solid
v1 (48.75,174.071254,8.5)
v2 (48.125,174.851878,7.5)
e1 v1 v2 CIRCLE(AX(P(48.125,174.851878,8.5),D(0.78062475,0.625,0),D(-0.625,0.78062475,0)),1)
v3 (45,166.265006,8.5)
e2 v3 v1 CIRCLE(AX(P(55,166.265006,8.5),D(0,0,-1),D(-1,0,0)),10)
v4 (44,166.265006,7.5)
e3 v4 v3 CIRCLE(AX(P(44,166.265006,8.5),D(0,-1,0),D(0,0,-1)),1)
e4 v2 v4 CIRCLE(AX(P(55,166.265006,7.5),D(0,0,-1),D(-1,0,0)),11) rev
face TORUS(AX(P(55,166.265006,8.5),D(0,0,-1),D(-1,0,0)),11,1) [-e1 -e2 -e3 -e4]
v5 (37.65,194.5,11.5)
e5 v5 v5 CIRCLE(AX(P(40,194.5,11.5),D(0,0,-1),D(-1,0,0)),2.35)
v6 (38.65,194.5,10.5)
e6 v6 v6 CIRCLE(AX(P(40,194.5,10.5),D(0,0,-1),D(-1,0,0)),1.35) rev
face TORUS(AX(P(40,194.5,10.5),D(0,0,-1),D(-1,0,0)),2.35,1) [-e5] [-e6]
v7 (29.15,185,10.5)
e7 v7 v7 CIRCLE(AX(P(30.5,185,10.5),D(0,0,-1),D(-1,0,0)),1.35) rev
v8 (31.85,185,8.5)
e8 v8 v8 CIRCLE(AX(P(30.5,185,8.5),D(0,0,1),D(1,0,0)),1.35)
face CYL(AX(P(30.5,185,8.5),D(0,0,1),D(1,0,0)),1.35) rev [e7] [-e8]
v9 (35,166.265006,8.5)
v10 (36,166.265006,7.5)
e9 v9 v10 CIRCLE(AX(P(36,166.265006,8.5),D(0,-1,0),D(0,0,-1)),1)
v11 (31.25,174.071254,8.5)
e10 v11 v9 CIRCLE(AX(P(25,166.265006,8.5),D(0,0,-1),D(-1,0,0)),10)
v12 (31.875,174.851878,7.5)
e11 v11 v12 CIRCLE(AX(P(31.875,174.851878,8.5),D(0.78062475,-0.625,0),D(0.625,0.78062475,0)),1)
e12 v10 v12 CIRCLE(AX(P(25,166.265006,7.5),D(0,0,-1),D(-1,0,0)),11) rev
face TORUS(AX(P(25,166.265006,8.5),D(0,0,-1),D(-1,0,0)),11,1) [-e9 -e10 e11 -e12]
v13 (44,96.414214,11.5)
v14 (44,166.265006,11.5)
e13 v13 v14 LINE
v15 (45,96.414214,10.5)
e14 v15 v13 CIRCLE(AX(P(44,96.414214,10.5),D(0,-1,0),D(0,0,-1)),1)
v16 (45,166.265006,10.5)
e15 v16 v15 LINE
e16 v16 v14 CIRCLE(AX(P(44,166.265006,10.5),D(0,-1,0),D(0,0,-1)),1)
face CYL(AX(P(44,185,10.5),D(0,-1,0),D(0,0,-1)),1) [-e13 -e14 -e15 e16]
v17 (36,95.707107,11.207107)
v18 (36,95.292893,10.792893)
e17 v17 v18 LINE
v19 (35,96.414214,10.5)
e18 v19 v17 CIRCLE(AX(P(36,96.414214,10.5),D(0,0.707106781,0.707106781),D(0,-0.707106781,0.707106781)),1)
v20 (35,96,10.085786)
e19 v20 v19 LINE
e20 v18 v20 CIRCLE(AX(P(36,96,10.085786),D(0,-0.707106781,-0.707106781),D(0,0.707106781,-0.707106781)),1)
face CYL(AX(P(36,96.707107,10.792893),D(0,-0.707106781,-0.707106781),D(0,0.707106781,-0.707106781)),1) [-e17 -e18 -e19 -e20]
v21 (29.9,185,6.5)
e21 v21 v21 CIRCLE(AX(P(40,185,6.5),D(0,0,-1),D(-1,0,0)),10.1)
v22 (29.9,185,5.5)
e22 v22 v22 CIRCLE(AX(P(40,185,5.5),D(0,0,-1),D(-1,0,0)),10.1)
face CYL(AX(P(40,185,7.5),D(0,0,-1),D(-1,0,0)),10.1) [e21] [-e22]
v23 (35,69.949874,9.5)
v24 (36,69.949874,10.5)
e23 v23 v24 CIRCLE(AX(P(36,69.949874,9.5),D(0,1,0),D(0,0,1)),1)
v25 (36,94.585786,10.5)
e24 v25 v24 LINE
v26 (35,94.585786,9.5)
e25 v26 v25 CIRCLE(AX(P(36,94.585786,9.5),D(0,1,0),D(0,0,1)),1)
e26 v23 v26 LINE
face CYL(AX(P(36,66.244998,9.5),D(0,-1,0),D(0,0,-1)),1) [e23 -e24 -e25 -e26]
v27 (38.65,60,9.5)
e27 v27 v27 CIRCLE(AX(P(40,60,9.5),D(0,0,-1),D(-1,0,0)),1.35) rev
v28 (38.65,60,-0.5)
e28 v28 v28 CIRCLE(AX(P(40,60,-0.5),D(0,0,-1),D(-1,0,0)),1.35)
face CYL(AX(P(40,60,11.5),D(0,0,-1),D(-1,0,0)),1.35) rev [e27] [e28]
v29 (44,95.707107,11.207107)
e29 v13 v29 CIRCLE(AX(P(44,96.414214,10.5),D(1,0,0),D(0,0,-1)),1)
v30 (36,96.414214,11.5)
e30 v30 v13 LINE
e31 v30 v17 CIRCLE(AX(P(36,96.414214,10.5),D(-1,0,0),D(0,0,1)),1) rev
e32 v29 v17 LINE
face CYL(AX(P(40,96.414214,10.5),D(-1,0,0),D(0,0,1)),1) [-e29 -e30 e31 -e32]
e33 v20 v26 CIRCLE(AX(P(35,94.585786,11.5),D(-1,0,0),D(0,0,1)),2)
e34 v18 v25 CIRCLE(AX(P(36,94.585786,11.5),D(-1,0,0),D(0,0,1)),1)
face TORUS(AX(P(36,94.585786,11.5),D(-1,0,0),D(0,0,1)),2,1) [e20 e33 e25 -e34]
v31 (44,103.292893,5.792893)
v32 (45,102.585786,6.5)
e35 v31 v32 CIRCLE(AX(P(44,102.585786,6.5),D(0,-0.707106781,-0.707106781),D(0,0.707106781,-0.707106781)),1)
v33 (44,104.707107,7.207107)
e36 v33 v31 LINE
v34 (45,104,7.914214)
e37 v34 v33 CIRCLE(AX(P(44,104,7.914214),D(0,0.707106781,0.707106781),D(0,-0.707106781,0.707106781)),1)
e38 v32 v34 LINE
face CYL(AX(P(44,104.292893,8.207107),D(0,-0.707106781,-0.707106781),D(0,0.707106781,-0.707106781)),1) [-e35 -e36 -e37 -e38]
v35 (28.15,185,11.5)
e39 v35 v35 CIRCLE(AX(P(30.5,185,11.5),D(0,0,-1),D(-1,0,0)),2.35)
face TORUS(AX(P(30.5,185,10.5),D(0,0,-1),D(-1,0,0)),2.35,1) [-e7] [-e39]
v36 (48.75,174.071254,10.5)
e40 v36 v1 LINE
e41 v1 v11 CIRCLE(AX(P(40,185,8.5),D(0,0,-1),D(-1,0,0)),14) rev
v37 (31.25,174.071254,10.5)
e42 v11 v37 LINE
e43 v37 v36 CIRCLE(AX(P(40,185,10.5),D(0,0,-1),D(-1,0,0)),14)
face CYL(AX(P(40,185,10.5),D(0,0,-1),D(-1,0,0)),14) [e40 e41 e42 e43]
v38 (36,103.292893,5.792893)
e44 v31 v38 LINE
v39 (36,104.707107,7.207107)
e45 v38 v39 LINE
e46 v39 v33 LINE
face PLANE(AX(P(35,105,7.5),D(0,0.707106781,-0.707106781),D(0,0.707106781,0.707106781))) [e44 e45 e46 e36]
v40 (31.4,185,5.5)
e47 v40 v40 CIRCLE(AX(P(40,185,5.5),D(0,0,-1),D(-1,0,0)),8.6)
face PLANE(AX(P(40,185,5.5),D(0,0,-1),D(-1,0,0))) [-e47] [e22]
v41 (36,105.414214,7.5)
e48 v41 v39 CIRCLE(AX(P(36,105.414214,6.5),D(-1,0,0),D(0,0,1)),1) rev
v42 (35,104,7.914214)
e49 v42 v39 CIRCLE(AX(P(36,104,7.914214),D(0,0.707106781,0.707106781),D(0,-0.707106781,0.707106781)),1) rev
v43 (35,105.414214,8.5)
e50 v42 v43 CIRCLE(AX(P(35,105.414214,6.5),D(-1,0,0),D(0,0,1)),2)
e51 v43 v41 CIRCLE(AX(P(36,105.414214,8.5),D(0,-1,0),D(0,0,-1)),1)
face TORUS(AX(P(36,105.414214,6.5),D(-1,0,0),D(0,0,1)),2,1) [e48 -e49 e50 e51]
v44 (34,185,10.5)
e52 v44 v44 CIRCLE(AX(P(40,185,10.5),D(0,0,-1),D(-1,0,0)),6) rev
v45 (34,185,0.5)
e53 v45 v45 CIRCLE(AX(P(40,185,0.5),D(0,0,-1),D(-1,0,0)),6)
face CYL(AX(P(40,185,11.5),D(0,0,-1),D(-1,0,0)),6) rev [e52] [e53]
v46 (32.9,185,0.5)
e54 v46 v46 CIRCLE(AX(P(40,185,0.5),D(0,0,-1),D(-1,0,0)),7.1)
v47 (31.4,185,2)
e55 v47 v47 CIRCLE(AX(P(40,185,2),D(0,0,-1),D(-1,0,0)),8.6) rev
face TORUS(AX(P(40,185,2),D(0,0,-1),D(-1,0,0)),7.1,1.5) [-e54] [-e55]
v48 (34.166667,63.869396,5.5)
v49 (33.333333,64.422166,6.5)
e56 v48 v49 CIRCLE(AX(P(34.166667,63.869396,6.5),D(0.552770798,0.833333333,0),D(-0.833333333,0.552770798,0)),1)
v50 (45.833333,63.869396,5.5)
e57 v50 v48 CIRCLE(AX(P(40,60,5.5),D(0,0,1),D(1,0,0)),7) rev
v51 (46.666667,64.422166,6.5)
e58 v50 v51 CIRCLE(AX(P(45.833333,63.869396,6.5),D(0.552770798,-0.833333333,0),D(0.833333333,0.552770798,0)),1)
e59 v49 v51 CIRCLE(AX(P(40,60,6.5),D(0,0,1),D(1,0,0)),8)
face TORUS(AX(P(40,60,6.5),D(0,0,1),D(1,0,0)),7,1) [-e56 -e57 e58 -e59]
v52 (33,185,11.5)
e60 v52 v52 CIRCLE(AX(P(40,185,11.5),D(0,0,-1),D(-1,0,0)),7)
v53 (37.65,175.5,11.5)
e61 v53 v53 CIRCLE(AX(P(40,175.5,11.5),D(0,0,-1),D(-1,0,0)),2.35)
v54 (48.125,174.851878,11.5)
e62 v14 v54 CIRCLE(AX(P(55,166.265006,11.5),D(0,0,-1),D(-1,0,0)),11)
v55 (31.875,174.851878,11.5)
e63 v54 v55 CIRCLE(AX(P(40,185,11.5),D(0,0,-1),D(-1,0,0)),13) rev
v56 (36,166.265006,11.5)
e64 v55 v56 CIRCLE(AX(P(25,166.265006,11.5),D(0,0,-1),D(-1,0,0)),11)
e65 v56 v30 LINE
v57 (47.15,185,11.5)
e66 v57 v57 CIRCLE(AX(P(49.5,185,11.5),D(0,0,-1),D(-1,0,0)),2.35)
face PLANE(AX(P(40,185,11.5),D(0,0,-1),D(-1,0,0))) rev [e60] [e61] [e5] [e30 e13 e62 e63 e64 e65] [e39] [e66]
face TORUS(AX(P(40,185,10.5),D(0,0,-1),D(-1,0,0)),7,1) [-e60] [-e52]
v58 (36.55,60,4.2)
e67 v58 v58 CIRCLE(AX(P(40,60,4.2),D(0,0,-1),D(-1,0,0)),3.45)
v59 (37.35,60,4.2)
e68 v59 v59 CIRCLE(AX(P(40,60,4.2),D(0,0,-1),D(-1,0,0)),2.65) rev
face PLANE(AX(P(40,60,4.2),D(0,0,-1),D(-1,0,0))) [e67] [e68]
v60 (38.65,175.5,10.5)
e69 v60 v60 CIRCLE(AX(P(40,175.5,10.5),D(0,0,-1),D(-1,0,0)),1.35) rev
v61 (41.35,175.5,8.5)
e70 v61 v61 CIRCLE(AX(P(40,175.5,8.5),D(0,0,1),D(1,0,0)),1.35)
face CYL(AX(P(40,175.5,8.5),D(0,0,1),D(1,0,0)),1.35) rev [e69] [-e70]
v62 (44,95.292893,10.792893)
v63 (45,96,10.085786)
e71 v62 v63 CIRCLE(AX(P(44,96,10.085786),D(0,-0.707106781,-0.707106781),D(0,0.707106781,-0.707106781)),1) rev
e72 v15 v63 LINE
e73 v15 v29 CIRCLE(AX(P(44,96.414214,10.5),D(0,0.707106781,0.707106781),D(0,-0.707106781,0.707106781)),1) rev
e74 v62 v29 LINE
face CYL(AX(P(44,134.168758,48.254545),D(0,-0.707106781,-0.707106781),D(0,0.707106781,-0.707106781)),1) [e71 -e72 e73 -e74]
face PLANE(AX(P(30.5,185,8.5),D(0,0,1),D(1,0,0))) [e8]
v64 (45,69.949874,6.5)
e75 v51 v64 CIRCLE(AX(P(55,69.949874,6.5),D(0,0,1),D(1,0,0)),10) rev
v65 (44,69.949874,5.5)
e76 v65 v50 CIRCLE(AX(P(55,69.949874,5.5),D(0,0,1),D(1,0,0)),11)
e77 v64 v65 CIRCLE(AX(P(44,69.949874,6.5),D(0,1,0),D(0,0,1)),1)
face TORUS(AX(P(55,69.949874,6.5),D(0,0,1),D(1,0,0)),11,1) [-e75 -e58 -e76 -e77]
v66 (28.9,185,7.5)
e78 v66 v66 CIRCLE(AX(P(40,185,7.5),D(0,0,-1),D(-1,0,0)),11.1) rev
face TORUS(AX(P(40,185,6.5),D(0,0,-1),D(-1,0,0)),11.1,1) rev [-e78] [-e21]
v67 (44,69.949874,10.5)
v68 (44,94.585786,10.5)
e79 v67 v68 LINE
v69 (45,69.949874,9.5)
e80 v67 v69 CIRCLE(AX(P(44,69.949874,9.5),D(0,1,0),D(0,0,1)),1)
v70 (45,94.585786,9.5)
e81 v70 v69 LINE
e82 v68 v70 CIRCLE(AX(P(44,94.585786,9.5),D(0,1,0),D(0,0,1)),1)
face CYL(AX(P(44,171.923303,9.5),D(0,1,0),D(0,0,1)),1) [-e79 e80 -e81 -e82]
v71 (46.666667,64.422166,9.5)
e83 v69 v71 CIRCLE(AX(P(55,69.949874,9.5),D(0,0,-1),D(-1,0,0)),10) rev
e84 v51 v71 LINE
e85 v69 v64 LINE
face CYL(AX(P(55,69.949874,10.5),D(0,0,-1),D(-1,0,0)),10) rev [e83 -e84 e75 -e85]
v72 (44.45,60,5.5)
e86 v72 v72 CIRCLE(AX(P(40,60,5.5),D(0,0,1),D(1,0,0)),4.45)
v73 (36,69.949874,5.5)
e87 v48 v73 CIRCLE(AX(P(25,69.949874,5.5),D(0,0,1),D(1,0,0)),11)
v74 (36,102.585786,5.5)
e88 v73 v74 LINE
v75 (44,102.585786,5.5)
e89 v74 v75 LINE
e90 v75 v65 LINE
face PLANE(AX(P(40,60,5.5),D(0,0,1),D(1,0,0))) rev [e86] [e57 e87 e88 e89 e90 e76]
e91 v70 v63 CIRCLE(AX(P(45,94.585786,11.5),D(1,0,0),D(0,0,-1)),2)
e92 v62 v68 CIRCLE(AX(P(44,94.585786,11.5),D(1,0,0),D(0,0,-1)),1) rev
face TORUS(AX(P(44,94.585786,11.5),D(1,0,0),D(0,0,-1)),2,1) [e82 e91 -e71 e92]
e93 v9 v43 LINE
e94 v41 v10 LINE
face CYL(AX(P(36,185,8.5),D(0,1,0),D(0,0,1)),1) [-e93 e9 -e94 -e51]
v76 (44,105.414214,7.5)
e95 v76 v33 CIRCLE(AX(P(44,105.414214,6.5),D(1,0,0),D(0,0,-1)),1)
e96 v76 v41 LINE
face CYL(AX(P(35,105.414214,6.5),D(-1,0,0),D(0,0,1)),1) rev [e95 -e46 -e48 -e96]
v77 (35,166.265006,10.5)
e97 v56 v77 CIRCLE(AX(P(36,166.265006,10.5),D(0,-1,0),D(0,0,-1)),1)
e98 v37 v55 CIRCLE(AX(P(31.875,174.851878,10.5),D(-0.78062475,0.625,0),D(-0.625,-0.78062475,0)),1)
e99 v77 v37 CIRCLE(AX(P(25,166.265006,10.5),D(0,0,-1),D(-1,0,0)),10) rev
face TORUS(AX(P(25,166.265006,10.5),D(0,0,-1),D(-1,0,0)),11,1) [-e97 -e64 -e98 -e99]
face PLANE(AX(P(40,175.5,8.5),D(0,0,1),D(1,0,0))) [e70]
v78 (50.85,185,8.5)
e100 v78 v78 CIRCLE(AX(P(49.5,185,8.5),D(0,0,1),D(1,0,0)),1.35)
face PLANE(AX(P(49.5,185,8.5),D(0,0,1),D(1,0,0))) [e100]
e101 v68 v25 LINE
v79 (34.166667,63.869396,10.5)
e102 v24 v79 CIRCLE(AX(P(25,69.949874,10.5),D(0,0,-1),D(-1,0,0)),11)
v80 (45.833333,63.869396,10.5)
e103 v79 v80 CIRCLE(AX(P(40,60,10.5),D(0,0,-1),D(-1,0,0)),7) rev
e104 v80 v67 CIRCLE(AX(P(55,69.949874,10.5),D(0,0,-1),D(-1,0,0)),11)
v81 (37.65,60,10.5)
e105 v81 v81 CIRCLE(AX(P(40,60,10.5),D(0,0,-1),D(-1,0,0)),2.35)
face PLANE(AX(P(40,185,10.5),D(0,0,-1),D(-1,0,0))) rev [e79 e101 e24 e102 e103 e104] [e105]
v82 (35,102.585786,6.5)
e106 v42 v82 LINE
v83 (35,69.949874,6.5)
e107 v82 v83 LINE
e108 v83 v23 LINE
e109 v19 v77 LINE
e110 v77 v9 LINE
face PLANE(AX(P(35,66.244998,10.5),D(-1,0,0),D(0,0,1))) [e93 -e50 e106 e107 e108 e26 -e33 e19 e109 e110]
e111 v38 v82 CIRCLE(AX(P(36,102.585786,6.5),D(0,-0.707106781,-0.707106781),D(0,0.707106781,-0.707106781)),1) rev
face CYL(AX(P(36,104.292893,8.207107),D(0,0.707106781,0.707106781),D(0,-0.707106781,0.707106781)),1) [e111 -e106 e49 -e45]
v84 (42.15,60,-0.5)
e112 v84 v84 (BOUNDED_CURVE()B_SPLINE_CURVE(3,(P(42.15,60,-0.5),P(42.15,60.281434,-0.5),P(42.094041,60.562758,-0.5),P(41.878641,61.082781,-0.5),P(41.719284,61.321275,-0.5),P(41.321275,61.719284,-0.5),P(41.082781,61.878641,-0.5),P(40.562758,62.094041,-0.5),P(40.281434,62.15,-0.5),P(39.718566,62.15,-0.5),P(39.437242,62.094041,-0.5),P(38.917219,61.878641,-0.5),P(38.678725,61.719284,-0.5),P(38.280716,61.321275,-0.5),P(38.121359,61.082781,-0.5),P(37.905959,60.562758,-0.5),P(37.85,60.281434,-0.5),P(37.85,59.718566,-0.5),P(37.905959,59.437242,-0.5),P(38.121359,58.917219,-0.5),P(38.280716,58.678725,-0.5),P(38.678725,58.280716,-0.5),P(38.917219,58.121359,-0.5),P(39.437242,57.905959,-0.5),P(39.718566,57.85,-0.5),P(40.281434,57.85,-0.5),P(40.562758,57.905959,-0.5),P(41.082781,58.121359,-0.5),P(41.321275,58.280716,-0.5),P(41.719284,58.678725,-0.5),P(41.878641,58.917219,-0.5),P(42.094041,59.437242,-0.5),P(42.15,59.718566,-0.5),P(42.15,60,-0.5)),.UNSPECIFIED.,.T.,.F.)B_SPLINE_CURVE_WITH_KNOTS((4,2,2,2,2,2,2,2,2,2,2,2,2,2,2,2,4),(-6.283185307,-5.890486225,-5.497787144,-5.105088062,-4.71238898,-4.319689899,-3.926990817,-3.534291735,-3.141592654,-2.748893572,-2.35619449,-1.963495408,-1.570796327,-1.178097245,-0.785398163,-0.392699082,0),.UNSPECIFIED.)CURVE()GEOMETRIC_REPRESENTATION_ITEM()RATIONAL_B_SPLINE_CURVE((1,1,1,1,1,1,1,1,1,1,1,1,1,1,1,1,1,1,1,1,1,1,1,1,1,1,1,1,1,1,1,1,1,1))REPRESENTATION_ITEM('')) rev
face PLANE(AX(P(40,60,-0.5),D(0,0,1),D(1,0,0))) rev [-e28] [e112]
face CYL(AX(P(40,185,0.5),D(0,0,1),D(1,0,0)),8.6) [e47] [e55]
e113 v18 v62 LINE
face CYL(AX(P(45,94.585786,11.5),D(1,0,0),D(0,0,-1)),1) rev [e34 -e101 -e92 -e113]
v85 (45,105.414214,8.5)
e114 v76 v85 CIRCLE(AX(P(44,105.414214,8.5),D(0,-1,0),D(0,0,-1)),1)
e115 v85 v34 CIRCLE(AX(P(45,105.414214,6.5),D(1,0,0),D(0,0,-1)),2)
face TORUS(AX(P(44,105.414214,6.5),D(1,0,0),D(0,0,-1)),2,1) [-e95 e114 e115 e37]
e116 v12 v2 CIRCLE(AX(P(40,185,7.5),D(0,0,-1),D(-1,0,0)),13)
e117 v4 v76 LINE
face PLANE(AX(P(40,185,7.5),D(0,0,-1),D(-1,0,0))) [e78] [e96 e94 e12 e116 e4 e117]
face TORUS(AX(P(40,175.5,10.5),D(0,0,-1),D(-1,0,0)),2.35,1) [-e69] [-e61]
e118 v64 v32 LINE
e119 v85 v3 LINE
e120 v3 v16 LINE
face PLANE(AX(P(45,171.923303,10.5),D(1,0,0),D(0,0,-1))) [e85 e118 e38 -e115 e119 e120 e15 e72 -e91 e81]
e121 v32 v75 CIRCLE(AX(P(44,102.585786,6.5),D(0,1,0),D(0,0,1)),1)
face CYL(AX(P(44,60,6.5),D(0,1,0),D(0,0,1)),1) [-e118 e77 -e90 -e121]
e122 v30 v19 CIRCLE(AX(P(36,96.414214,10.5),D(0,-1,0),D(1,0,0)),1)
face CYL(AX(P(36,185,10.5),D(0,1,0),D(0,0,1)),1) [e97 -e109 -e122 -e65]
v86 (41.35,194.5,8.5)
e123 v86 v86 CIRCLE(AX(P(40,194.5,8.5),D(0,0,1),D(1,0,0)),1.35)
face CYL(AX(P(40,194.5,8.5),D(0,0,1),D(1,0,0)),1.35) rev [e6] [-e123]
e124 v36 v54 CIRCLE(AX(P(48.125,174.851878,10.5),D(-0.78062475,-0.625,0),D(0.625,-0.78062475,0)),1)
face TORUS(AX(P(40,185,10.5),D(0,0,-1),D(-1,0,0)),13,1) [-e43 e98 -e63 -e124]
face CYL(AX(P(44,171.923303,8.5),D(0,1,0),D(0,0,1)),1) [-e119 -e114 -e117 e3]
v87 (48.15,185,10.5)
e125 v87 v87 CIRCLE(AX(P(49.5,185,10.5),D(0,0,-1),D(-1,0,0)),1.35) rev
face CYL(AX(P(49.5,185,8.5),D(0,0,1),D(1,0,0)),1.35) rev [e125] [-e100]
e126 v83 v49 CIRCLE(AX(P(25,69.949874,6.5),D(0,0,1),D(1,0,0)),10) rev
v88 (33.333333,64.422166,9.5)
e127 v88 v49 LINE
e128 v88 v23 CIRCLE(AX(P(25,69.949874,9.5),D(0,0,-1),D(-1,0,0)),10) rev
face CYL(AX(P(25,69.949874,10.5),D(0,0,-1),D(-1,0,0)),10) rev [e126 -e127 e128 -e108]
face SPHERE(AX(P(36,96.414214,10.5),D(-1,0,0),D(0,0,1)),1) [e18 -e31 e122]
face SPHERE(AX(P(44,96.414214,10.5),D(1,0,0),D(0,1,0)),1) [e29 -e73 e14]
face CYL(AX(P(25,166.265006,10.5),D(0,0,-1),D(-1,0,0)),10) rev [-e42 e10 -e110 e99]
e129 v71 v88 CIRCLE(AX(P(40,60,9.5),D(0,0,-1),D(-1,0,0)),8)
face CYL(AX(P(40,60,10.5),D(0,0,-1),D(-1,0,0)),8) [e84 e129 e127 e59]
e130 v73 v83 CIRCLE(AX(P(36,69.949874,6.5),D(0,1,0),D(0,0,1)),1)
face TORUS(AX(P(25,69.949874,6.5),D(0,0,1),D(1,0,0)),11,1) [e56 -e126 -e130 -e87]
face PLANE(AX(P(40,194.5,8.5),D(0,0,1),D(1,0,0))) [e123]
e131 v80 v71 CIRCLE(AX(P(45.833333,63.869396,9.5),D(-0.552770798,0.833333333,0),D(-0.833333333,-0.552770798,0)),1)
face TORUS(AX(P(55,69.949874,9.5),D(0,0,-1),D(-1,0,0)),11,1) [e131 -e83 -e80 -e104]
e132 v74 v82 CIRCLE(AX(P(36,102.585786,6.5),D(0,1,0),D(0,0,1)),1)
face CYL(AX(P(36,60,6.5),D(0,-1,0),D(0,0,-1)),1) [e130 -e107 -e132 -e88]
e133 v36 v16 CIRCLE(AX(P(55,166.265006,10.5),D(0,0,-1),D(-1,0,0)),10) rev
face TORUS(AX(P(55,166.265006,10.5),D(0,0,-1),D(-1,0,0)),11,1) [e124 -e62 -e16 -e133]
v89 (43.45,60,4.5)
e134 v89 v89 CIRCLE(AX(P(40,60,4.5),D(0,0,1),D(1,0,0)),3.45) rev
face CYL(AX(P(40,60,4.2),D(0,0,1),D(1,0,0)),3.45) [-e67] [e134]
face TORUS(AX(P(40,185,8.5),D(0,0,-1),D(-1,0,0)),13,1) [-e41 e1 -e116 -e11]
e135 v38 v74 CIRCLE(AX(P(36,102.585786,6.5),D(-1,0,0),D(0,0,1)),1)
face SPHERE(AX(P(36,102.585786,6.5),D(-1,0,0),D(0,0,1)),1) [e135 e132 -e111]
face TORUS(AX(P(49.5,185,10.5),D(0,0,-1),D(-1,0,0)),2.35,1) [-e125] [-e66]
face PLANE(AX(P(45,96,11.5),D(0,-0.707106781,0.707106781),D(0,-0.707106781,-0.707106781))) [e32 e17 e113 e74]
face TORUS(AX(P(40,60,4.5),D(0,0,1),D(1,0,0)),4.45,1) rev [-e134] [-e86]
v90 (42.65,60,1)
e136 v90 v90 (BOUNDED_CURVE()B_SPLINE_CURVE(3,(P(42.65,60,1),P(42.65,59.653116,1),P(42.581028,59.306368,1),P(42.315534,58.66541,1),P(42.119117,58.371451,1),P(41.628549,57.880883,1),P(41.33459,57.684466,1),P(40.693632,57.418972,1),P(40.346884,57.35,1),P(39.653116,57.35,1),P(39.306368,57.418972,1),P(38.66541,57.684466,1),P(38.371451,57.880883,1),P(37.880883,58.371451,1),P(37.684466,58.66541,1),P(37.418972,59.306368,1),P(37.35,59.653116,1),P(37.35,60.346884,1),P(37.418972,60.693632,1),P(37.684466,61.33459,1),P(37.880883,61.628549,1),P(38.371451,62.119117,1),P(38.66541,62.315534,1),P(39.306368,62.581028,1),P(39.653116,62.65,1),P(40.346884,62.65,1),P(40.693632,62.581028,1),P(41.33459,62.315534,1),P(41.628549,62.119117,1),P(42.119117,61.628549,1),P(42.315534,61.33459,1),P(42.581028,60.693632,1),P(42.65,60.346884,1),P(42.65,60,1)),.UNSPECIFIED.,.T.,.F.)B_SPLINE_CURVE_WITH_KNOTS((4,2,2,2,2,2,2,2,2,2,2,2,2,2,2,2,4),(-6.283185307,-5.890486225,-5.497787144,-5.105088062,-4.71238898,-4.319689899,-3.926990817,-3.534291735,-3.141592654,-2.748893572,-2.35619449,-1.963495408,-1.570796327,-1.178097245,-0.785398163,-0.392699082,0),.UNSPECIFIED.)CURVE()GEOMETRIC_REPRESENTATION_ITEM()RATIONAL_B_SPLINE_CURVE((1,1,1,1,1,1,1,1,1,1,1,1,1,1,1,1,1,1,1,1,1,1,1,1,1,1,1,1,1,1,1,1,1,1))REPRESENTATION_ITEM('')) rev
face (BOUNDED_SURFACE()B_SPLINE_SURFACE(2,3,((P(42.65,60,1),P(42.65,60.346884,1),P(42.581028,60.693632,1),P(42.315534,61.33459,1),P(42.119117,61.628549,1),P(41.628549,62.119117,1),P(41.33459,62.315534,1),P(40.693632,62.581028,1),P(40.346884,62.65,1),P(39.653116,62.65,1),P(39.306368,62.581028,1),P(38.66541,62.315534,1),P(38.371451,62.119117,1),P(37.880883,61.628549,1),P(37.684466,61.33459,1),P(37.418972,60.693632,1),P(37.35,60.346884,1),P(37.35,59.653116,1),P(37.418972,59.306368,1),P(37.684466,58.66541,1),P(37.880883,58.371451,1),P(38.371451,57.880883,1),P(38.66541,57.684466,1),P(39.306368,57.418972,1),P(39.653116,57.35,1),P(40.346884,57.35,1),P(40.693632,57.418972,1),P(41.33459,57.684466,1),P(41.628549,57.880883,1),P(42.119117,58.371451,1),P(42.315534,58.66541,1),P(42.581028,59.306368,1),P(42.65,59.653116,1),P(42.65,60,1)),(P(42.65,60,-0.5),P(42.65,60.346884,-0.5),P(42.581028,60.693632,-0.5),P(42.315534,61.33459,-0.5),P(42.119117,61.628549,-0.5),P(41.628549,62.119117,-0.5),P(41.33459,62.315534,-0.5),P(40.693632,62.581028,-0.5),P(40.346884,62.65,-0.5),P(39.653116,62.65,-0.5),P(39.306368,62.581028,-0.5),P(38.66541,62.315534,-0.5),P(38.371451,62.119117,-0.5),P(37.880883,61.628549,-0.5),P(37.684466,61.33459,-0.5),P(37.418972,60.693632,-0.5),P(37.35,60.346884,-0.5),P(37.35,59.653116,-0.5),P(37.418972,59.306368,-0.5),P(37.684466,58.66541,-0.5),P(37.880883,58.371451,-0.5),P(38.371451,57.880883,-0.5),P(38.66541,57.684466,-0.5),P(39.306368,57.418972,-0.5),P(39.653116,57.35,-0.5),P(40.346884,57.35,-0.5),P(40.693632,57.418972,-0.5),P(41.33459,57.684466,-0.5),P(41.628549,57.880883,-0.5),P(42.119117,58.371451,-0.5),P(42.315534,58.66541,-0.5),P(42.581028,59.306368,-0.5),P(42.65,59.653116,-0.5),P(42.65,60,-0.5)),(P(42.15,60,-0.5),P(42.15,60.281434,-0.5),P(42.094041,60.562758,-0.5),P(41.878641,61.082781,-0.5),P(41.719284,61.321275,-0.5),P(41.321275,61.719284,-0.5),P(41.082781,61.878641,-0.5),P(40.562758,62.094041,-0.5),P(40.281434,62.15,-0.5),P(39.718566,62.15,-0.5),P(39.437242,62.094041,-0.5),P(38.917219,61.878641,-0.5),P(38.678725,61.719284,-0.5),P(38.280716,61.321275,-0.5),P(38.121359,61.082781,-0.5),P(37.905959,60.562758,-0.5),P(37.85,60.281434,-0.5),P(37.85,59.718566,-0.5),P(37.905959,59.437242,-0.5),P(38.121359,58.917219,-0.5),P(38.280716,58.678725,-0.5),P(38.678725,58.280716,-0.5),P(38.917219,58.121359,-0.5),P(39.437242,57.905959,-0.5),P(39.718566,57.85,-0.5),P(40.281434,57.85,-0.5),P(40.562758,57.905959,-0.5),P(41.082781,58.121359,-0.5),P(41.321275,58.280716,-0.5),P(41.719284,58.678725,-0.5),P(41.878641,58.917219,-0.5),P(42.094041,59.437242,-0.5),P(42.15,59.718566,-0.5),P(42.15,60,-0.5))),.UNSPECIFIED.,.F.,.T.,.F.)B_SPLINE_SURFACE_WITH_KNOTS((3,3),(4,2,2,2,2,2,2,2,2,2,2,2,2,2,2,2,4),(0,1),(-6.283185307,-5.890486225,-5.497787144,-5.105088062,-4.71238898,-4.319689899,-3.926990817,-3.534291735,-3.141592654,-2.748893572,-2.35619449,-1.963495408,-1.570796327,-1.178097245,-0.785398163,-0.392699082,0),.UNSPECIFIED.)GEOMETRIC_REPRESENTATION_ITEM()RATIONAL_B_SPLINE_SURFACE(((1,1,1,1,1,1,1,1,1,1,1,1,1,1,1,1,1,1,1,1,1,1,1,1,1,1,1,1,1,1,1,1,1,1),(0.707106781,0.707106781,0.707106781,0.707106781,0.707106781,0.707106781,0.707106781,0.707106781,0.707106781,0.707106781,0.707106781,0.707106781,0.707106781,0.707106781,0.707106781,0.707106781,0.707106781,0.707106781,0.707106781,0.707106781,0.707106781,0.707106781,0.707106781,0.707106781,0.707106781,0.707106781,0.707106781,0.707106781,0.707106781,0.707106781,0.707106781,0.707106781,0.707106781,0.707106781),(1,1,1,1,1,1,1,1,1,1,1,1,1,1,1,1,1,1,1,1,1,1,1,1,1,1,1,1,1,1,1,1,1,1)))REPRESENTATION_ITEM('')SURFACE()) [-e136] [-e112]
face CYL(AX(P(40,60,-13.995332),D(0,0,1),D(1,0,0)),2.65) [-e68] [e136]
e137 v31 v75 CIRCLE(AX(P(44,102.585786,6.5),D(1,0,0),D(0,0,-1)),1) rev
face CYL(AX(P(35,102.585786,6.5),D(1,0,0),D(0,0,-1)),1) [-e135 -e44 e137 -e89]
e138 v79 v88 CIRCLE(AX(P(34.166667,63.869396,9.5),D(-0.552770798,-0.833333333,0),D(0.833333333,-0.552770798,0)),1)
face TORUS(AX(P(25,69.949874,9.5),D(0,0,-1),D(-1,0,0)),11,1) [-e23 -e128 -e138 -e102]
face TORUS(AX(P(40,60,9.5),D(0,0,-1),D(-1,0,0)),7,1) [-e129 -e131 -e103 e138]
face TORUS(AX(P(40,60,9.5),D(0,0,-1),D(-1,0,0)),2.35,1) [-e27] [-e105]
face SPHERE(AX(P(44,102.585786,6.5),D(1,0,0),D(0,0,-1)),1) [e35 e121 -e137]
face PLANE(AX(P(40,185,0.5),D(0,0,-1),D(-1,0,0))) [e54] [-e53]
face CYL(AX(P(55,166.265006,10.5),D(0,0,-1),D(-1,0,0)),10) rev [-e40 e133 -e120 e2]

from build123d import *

# Parameters (mm, degrees)
BOSS_EXTRUDE1_DEPTH = 3
BOSS_EXTRUDE2_START = 2
BOSS_EXTRUDE2_DEPTH = 2
SKETCH3_W           = 10
SKETCH3_H           = 2
CUT_EXTRUDE1_DEPTH  = 66.923303169
BOSS_EXTRUDE3_DEPTH = 1
BOSS_EXTRUDE4_START = 2
SKETCH5_R           = 14
BOSS_EXTRUDE4_DEPTH = 2
SKETCH6_R           = 12.5
BOSS_EXTRUDE5_DEPTH = 4
DRAFT1_ANGLE        = 45
DRAFT2_ANGLE        = 45
SKETCH7_W           = 2
SKETCH7_H           = 0.5
HOLEWZD1_D          = 20
HOLEWZD2_D          = 3
HOLEWZD2_DEPTH      = 6.5
FILLET1_R           = 10
SKETCH12_R          = 2.65
BOSS_EXTRUDE6_DEPTH = 11
CUT_EXTRUDE2_START  = -4
SKETCH13_R          = 12.5
CUT_EXTRUDE2_DEPTH  = 4
SKETCH14_R          = 14
BOSS_EXTRUDE7_DEPTH = 6
SKETCH15_R          = 8.6
BOSS_EXTRUDE8_DEPTH = 5
FILLET2_R           = 1.5
SKETCH16_R          = 14
SKETCH16_R_2        = 10.1
CUT_EXTRUDE3_DEPTH  = 2
SKETCH18_R          = 6
CUT_EXTRUDE4_DEPTH  = 207.489709187
SKETCH19_R          = 1.35
CUT_EXTRUDE5_DEPTH  = 3
FILLET3_SIZE        = 1.5
FILLET3_SIZE_2      = 0.5
SKETCH21_R          = 1.35
CUT_EXTRUDE8_DEPTH  = 207.545394526
FILLET5_R           = 1
BOSS_EXTRUDE9_START = 1.3
SKETCH22_R          = 3.45
SKETCH22_R_2        = 1.35
BOSS_EXTRUDE9_DEPTH = 1.3
FILLET6_R           = 1


with BuildPart() as part:
    # Sketch1 → Boss-Extrude1 (new body)
    with BuildSketch(Plane(origin=(0, 0, 7.5), x_dir=(-1, 0, 0), z_dir=(0, 0, -1))):
        with BuildLine():
            Line((-45, 171.923303169), (-45, 66.244997998))
            ThreePointArc((-45, 66.244997998), (-40, 52), (-35, 66.244997998))
            Line((-35, 66.244997998), (-35, 171.923303169))
            ThreePointArc((-35, 171.923303169), (-40, 199), (-45, 171.923303169))
        make_face()
    extrude(amount=-BOSS_EXTRUDE1_DEPTH)

    # Sketch2 → Boss-Extrude2 (add)
    with BuildSketch(Plane(origin=(0, 0, 7.5), x_dir=(-1, 0, 0), z_dir=(0, 0, -1)).offset(BOSS_EXTRUDE2_START)):
        with BuildLine():
            Line((-45, 66.244997998), (-45, 171.923303169))
            Line((-45, 171.923303169), (-35, 171.923303169))
            Line((-35, 171.923303169), (-35, 66.244997998))
            ThreePointArc((-35, 66.244997998), (-40, 52), (-45, 66.244997998))
        make_face()
    extrude(amount=-BOSS_EXTRUDE2_DEPTH)

    # Sketch3 → Cut-Extrude1 (cut)
    with BuildSketch(Plane(origin=(0, 171.923303169, 0), x_dir=(-1, 0, 0), z_dir=(0, 1, 0))):
        with Locations((-40, 6.5)):
            Rectangle(SKETCH3_W, SKETCH3_H)
    extrude(amount=-CUT_EXTRUDE1_DEPTH, mode=Mode.SUBTRACT)

    # Sketch4 → Boss-Extrude3 (add)
    with BuildSketch(Plane.XY.offset(10.5)):
        with BuildLine():
            Line((35, 96), (35, 171.923303169))
            ThreePointArc((35, 171.923303169), (40, 199), (45, 171.923303169))
            Line((45, 171.923303169), (45, 96))
            Line((45, 96), (35, 96))
        make_face()
    extrude(amount=BOSS_EXTRUDE3_DEPTH)

    # Sketch5 → Boss-Extrude4 (add)
    with BuildSketch(Plane(origin=(0, 0, 7.5), x_dir=(-1, 0, 0), z_dir=(0, 0, -1)).offset(BOSS_EXTRUDE4_START)):
        with Locations((-40, 185)):
            Circle(SKETCH5_R)
    extrude(amount=-BOSS_EXTRUDE4_DEPTH)

    # Sketch6 → Boss-Extrude5 (add)
    with BuildSketch(Plane(origin=(0, 0, 5.5), x_dir=(-1, 0, 0), z_dir=(0, 0, -1))):
        with Locations((-40, 185)):
            Circle(SKETCH6_R)
    extrude(amount=BOSS_EXTRUDE5_DEPTH)

    # Draft1
    draft1_faces = [part.faces().sort_by_distance(p)[0] for p in [
        (40, 96, 11),
    ]]
    draft(draft1_faces, Plane(origin=(40, 185, 11.5), x_dir=(1, 0, 0), z_dir=(0, 0, 1)), DRAFT1_ANGLE)

    # Draft2
    draft2_faces = [part.faces().sort_by_distance(p)[0] for p in [
        (40, 105, 6.5),
    ]]
    draft(draft2_faces, Plane(origin=(40, 185, 7.5), x_dir=(-1, 0, 0), z_dir=(0, 0, -1)), DRAFT2_ANGLE)

    # Sketch7 → Revolve1 (revolve)
    with BuildSketch(Plane.XZ.offset(-60), mode=Mode.PRIVATE) as revolve1_sk:
        with Locations((41, 5.25)):
            Rectangle(SKETCH7_W, SKETCH7_H)
    revolve(revolve1_sk.sketch.rotate(Axis((40, 60, 5.5), (0, 0, -1)), 180), axis=Axis((40, 60, 5.5), (0, 0, -1)))

    # HoleWzd1 (through all)
    with Locations(Plane.XY.offset(11.5)):
        with Locations((40, 185)):
            Hole(HOLEWZD1_D / 2)

    # HoleWzd2
    with Locations(Plane(origin=(0, 0, 5), x_dir=(-1, 0, 0), z_dir=(0, 0, -1))):
        with Locations((-40, 60)):
            Hole(HOLEWZD2_D / 2, depth=HOLEWZD2_DEPTH)

    # Fillet1
    # the kernel refuses this fillet: 10 mm, written as the material it adds along each edge
    with BuildSketch(Plane(origin=(35, 171.923303169, 7.5), x_dir=(-0.8677350071061872, 0.49702711942350297, 0), z_dir=(0, 0, 1))) as fillet1_piece_1:
        with BuildLine():
            CenterArc((5.865022931, 9.880173725), FILLET1_R, 209.803509941, 51.317812547)
            Line((-2.812327141, 4.90990253), (0, 0))
            ThreePointArc((0, 0), (2.160797922, 0.167756786), (4.321595844, 0))
        make_face()
    extrude(amount=3)
    with BuildSketch(Plane(origin=(35, 66.244997998, 7.5), x_dir=(-0.6747863487276905, -0.7380131323836668, 0), z_dir=(0, 0, 1))) as fillet1_piece_2:
        with BuildLine():
            CenterArc((4.01361607, -9.880131324), FILLET1_R, 98.880251392, 33.557309762)
            Line((-2.734247417, -2.5), (0, 0))
            ThreePointArc((0, 0), (1.234958791, -0.095894941), (2.469917582, 0))
        make_face()
    extrude(amount=3)
    with BuildSketch(Plane(origin=(45, 66.244997998, 7.5), x_dir=(0, 1, 0), z_dir=(0, 0, 1))) as fillet1_piece_3:
        with BuildLine():
            CenterArc((3.704876373, -10), FILLET1_R, 90, 33.557309762)
            ThreePointArc((-1.822831611, -1.666666667), (-0.846707209, -0.904105059), (0, 0))
            Line((0, 0), (3.704876373, 0))
        make_face()
    extrude(amount=3)
    with BuildSketch(Plane(origin=(45, 171.923303169, 7.5), x_dir=(0, -1, 0), z_dir=(0, 0, 1))) as fillet1_piece_4:
        with BuildLine():
            CenterArc((5.658297165, 10), FILLET1_R, 218.682187453, 51.317812547)
            ThreePointArc((-2.147950333, 3.75), (-0.928406731, 1.958379672), (0, 0))
            Line((0, 0), (5.658297165, 0))
        make_face()
    extrude(amount=4)
    with BuildSketch(Plane(origin=(45, 66.244997998, 5.5), x_dir=(0, 1, 0), z_dir=(0, 0, 1))) as fillet1_piece_5:
        with BuildLine():
            CenterArc((3.704876373, -10), FILLET1_R, 90, 33.557309762)
            ThreePointArc((-1.822831611, -1.666666667), (-0.846707209, -0.904105059), (0, 0))
            Line((0, 0), (3.704876373, 0))
        make_face()
    extrude(amount=2)
    with BuildSketch(Plane(origin=(35, 66.244997998, 5.5), x_dir=(-0.6747863487276905, -0.7380131323836668, 0), z_dir=(0, 0, 1))) as fillet1_piece_6:
        with BuildLine():
            CenterArc((4.01361607, -9.880131324), FILLET1_R, 98.880251392, 33.557309762)
            Line((-2.734247417, -2.5), (0, 0))
            ThreePointArc((0, 0), (1.234958791, -0.095894941), (2.469917582, 0))
        make_face()
    extrude(amount=2)
    with BuildSketch(Plane(origin=(35, 171.923303169, 10.5), x_dir=(-0.8677350071061872, 0.49702711942350297, 0), z_dir=(0, 0, 1))) as fillet1_piece_7:
        with BuildLine():
            CenterArc((5.865022931, 9.880173725), FILLET1_R, 209.803509941, 51.317812547)
            Line((-2.812327141, 4.90990253), (0, 0))
            ThreePointArc((0, 0), (2.160797922, 0.167756786), (4.321595844, 0))
        make_face()
    extrude(amount=1)

    # Sketch12 → Boss-Extrude6 (add)
    with BuildSketch(Plane.XY.offset(10.5)):
        with Locations((40, 60)):
            Circle(SKETCH12_R)
    extrude(amount=-BOSS_EXTRUDE6_DEPTH)

    # Sketch13 → Cut-Extrude2 (cut)
    with BuildSketch(Plane(origin=(0, 0, 1.5), x_dir=(-1, 0, 0), z_dir=(0, 0, -1)).offset(CUT_EXTRUDE2_START)):
        with Locations((-40, 185)):
            Circle(SKETCH13_R)
    extrude(amount=CUT_EXTRUDE2_DEPTH, mode=Mode.SUBTRACT)

    # Sketch14 → Boss-Extrude7 (add)
    with BuildSketch(Plane(origin=(0, 0, 5.5), x_dir=(-1, 0, 0), z_dir=(0, 0, -1))):
        with Locations((-40, 185)):
            Circle(SKETCH14_R)
    extrude(amount=-BOSS_EXTRUDE7_DEPTH)

    # Sketch15 → Boss-Extrude8 (add)
    with BuildSketch(Plane(origin=(0, 0, 5.5), x_dir=(-1, 0, 0), z_dir=(0, 0, -1))):
        with Locations((-40, 185)):
            Circle(SKETCH15_R)
    extrude(amount=BOSS_EXTRUDE8_DEPTH)

    # Fillet2
    fillet2_edges = [part.edges().sort_by_distance(p)[0] for p in [
        (48.6, 185, 0.5),
    ]]
    fillet(fillet2_edges, radius=FILLET2_R)

    # Sketch16 → Cut-Extrude3 (cut)
    with BuildSketch(Plane(origin=(0, 0, 5.5), x_dir=(-1, 0, 0), z_dir=(0, 0, -1))):
        with Locations((-40, 185)):
            Circle(SKETCH16_R)
        with Locations((-40, 185)):
            Circle(SKETCH16_R_2, mode=Mode.SUBTRACT)
    extrude(amount=-CUT_EXTRUDE3_DEPTH, mode=Mode.SUBTRACT)

    # Sketch18 → Cut-Extrude4 (cut, through all)
    with BuildSketch(Plane(origin=(0, 0, 0.5), x_dir=(-1, 0, 0), z_dir=(0, 0, -1))):
        with Locations((-40, 185)):
            Circle(SKETCH18_R)
    extrude(amount=-CUT_EXTRUDE4_DEPTH, mode=Mode.SUBTRACT)

    # Sketch19 → Cut-Extrude5 (cut)
    with BuildSketch(Plane.XY.offset(11.5)):
        with Locations((40, 194.5)):
            Circle(SKETCH19_R)
        with Locations((49.5, 185)):
            Circle(SKETCH19_R)
        with Locations((30.5, 185)):
            Circle(SKETCH19_R)
        with Locations((40, 175.5)):
            Circle(SKETCH19_R)
    extrude(amount=-CUT_EXTRUDE5_DEPTH, mode=Mode.SUBTRACT)

    # Fillet3
    # an asymmetric fillet: 1.5, 0.5 mm, written as the material it takes off along each edge
    with BuildSketch(Plane(origin=(40, 60, -0.5), x_dir=(1, 0, 0), z_dir=(0, -1, 0))) as fillet3_piece_1:
        with BuildLine():
            Bezier((2.65, FILLET3_SIZE), (2.65, 0), (2.65 - FILLET3_SIZE_2, 0), weights=[1, 0.707106781, 1])
            Line((2.65 - FILLET3_SIZE_2, 0), (2.65, 0))
            Line((2.65, 0), (2.65, FILLET3_SIZE))
        make_face()
    revolve(axis=Axis((40, 60, -0.5), (0, 0, 1)), mode=Mode.SUBTRACT)

    # Sketch21 → Cut-Extrude8 (cut, through all)
    with BuildSketch(Plane(origin=(0, 0, -0.5), x_dir=(-1, 0, 0), z_dir=(0, 0, -1))):
        with Locations((-40, 60)):
            Circle(SKETCH21_R)
    extrude(amount=-CUT_EXTRUDE8_DEPTH, mode=Mode.SUBTRACT)

    # Fillet5
    fillet5_edges = [part.edges().sort_by_distance(p)[0] for p in [
        (41.35, 60, 10.5),
    ]]
    fillet(fillet5_edges, radius=FILLET5_R)

    # Sketch22 → Boss-Extrude9 (add)
    with BuildSketch(Plane(origin=(0, 0, 5.5), x_dir=(-1, 0, 0), z_dir=(0, 0, -1)).offset(BOSS_EXTRUDE9_START)):
        with Locations(Location((-40, 60, 0), (0, 0, 180))):
            Circle(SKETCH22_R)
        with Locations((-40, 60)):
            Circle(SKETCH22_R_2, mode=Mode.SUBTRACT)
    extrude(amount=-BOSS_EXTRUDE9_DEPTH)

    # Fillet6
    fillet6_edges = [part.edges().sort_by_distance(p)[0] for p in [
        (45, 95.5, 11),
        (35, 95.5, 11),
        (35, 104, 6.5),
        (45, 104, 6.5),
        (35, 86.474937186, 5.5),
        (34.574271078, 67.063123025, 5.5),
        (40, 52, 5.5),
        (45.425728922, 67.063123025, 5.5),
        (45, 86.474937186, 5.5),
        (40, 103, 5.5),
        (45, 131.132503002, 11.5),
        (40, 96, 11.5),
        (35, 131.132503002, 11.5),
        (34.013878189, 170.595133024, 11.5),
        (40, 199, 11.5),
        (45.986121811, 170.595133024, 11.5),
        (46, 185, 11.5),
        (38.65, 175.5, 11.5),
        (29.15, 185, 11.5),
        (48.15, 185, 11.5),
        (38.65, 194.5, 11.5),
        (45, 82.474937186, 10.5),
        (45.425728922, 67.063123025, 10.5),
        (40, 52, 10.5),
        (34.574271078, 67.063123025, 10.5),
        (35, 82.474937186, 10.5),
        (40, 95, 10.5),
        (50.1, 185, 7.5),
        (40, 105, 7.5),
        (45, 135.632503002, 7.5),
        (45.986121811, 170.595133024, 7.5),
        (40, 199, 7.5),
        (34.013878189, 170.595133024, 7.5),
        (35, 135.632503002, 7.5),
        (36.55, 60, 5.5),
    ]]
    fillet(fillet6_edges, radius=FILLET6_R)


solid = part.part
